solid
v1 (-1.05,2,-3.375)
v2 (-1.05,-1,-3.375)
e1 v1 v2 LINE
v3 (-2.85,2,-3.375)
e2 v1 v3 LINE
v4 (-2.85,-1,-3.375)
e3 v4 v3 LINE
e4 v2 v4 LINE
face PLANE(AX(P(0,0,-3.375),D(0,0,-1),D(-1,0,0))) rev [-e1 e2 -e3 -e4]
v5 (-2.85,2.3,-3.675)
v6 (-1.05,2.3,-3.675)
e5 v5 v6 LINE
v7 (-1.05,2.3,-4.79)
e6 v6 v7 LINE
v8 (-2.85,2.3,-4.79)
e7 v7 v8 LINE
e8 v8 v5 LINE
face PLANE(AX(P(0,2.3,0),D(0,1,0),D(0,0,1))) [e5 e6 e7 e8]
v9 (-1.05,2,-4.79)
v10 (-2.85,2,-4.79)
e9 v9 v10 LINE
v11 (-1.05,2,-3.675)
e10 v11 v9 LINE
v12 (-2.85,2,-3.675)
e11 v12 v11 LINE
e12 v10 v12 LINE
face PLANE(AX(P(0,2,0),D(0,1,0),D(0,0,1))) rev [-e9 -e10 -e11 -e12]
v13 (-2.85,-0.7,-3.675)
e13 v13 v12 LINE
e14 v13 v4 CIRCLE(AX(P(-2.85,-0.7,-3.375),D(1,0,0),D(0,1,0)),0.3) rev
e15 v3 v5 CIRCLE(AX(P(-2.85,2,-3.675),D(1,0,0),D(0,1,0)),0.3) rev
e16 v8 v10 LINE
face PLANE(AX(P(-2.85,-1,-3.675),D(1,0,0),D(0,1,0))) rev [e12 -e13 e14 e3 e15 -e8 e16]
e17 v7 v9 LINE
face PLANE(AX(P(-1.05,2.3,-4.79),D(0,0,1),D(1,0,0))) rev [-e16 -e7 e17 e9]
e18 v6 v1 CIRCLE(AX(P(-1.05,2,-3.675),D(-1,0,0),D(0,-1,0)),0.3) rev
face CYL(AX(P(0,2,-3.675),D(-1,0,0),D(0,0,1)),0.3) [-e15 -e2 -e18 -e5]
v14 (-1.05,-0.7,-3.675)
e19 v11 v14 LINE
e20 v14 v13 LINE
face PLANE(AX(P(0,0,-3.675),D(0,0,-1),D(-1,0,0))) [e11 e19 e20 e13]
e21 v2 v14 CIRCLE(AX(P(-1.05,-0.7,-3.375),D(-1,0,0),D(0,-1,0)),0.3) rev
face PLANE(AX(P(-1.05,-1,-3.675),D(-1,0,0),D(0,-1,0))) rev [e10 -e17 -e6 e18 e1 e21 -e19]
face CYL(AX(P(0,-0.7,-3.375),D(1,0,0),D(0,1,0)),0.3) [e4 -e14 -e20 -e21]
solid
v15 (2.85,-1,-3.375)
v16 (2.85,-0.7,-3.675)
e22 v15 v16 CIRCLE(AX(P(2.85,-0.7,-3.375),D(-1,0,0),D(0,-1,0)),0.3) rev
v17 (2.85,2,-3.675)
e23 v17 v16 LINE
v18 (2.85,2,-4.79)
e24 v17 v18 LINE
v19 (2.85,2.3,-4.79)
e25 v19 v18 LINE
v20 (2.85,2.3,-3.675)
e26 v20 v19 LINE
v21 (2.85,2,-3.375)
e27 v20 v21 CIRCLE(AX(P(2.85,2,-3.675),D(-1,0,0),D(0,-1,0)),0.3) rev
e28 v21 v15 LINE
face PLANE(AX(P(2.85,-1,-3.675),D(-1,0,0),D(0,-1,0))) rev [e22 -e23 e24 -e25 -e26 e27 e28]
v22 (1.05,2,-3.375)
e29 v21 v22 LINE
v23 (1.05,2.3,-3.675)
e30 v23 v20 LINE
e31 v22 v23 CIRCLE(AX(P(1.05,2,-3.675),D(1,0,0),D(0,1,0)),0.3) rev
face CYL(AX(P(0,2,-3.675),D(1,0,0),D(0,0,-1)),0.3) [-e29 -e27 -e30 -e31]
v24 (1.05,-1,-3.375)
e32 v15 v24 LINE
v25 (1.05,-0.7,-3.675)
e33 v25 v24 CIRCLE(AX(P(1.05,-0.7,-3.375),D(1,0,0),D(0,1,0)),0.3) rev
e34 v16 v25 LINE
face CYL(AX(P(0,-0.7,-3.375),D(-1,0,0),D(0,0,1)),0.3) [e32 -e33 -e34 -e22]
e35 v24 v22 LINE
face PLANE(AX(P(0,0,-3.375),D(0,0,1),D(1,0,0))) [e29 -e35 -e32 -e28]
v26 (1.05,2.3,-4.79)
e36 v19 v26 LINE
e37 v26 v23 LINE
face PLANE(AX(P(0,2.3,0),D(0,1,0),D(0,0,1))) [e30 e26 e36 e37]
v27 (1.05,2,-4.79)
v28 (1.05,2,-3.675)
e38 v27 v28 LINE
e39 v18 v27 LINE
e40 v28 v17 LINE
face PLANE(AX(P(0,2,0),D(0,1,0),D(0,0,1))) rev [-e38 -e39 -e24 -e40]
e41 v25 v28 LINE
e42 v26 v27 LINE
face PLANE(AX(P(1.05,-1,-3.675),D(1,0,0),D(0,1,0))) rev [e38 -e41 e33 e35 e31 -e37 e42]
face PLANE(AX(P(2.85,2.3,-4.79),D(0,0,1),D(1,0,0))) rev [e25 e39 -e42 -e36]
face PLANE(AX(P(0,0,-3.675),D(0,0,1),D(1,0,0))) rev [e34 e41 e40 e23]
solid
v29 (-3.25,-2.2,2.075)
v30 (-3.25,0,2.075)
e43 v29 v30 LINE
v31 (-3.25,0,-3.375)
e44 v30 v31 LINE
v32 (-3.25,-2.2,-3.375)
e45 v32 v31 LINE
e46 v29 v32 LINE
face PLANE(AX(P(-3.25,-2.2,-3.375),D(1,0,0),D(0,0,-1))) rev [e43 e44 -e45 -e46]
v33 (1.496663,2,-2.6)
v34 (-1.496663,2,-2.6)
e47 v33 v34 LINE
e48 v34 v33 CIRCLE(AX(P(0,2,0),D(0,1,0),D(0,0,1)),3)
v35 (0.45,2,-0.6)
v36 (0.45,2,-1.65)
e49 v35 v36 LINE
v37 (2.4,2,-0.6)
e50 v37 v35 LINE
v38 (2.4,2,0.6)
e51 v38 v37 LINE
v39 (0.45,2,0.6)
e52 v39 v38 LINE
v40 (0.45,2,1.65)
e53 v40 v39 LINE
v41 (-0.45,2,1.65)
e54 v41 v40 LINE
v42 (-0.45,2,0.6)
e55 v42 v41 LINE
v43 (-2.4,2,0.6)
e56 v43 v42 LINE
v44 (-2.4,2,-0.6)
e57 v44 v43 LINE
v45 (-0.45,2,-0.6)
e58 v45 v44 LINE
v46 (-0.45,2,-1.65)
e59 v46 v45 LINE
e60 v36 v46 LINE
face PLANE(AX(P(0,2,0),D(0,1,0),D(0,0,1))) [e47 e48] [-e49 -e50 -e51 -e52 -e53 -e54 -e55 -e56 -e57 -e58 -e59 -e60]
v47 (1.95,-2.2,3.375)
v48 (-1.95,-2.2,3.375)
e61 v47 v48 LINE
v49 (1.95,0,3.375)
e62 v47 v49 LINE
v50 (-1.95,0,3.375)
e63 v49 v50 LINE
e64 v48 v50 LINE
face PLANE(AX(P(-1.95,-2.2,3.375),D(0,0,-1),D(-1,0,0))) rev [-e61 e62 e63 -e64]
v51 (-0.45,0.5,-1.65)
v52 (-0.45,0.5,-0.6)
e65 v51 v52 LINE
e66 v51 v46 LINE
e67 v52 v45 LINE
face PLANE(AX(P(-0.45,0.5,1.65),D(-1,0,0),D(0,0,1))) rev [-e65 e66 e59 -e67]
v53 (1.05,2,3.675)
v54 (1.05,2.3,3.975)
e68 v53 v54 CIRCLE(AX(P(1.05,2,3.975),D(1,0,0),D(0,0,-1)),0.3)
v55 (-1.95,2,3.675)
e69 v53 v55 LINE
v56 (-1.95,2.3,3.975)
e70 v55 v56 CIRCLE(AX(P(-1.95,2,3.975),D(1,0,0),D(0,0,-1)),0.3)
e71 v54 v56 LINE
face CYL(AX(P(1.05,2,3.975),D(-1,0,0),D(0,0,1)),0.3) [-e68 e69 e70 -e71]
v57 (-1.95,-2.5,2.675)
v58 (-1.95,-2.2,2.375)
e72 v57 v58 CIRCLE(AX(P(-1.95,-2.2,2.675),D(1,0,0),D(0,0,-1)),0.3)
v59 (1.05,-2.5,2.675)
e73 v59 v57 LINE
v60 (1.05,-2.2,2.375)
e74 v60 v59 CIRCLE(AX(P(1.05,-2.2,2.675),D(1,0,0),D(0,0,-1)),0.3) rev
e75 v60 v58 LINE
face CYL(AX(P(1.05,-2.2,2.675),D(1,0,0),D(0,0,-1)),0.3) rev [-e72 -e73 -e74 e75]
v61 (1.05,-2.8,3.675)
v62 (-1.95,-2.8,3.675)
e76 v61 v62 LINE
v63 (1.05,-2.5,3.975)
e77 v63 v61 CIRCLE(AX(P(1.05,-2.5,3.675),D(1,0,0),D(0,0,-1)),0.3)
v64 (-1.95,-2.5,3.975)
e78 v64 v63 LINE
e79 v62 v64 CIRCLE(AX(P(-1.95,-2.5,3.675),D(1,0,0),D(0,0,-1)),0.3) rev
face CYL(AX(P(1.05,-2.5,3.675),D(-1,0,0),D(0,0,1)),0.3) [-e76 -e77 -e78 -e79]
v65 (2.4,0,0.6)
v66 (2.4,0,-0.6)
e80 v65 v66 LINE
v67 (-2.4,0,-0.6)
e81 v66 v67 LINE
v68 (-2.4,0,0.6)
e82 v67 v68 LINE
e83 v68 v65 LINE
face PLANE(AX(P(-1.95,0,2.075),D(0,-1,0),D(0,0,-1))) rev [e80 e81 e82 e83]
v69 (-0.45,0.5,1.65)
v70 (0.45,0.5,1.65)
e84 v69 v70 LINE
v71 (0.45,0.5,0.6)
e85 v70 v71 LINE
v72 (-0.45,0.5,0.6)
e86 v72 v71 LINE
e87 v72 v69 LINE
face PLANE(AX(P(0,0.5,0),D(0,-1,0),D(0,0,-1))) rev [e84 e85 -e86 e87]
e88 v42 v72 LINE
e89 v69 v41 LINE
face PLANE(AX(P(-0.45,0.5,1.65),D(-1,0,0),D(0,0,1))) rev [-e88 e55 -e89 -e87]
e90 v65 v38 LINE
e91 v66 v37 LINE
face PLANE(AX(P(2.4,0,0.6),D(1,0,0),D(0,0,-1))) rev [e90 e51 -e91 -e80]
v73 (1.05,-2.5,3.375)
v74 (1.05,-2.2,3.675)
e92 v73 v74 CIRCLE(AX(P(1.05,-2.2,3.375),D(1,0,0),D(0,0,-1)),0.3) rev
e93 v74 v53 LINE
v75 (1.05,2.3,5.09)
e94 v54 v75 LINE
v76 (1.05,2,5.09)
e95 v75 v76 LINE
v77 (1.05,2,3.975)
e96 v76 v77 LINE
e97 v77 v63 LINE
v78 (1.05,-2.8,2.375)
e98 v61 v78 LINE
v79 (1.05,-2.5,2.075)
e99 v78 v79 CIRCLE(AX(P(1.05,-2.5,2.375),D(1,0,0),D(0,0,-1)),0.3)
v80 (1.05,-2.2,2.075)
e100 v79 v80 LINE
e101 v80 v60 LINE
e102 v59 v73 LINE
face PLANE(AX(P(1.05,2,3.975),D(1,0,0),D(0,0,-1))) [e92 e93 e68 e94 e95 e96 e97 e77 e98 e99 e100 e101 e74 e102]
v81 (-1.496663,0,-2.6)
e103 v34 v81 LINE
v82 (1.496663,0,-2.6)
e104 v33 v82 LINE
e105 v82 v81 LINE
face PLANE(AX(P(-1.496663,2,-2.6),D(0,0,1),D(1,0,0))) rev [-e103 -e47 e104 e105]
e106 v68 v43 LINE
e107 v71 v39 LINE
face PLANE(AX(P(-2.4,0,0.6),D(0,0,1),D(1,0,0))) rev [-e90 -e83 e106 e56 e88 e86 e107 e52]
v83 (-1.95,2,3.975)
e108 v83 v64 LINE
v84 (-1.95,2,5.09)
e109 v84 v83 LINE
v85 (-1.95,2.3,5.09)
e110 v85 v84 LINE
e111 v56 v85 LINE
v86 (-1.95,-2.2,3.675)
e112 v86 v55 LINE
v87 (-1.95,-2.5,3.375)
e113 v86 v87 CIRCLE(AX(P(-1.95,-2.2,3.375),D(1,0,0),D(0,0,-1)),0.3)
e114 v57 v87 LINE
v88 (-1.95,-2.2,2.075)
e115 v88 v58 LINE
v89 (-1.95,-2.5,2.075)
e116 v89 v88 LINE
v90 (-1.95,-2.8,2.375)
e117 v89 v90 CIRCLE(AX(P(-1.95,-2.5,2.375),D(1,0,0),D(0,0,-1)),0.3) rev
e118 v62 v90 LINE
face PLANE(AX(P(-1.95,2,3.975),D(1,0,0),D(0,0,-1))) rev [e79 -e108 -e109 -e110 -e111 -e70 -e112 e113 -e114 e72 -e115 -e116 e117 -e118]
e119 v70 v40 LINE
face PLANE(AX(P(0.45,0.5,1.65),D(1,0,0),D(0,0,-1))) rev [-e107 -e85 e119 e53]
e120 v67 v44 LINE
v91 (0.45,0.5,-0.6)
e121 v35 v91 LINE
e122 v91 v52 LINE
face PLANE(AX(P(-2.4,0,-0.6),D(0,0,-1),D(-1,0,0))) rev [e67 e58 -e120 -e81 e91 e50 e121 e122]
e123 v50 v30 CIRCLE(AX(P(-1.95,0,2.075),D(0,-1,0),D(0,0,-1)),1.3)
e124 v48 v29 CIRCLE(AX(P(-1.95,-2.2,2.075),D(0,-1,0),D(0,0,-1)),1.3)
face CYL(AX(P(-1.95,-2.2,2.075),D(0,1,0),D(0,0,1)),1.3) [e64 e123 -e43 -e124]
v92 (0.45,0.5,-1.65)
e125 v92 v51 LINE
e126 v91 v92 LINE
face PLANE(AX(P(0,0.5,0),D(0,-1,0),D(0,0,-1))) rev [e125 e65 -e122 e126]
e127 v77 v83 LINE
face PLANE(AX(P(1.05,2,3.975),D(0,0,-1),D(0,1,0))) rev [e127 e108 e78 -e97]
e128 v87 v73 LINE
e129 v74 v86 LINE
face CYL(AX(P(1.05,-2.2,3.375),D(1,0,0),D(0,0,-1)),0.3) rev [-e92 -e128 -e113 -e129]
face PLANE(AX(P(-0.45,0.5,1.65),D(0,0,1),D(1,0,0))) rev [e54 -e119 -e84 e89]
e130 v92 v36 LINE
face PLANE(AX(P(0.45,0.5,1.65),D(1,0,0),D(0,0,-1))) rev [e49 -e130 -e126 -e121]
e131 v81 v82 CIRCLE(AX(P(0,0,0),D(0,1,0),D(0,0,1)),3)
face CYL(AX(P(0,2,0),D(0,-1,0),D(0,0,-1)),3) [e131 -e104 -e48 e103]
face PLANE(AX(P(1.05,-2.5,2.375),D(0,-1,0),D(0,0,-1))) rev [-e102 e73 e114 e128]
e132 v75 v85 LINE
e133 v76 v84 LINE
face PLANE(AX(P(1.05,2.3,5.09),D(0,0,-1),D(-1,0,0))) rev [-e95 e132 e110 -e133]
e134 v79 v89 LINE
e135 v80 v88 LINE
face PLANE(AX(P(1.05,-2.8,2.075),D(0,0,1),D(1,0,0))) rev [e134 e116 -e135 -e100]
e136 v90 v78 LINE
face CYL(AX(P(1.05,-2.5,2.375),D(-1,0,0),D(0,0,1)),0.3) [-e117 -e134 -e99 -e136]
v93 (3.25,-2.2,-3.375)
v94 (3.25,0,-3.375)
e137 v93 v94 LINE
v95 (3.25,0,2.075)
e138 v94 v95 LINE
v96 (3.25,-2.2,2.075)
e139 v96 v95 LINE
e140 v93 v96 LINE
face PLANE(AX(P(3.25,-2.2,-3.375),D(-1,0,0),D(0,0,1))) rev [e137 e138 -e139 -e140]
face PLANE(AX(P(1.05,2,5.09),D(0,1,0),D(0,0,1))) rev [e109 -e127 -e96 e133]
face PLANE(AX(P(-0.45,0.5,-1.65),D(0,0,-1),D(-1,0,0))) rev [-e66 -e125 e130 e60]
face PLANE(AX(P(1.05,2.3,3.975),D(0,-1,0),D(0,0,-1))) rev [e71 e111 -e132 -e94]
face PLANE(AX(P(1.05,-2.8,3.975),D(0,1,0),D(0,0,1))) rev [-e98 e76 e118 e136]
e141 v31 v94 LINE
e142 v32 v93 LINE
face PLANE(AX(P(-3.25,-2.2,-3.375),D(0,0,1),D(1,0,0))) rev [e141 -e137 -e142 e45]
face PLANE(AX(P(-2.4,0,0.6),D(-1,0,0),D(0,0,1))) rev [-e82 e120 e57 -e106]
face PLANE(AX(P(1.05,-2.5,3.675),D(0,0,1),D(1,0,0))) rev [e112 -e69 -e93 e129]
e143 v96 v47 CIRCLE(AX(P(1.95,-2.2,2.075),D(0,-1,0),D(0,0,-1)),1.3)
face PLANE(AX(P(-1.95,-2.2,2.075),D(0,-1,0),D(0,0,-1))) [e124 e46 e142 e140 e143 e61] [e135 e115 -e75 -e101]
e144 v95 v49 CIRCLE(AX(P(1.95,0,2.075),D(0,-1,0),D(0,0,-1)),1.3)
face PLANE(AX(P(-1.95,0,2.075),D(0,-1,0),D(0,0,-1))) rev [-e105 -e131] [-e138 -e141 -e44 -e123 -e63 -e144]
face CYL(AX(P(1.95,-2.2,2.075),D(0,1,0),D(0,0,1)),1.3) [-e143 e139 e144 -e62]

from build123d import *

# Parameters (mm, degrees)
BOSS_EXTRUDE1_DEPTH   = 2
SKETCH2_W             = 4.8
SKETCH2_H             = 1.2
CUT_EXTRUDE1_DEPTH    = 5.69041576
SKETCH3_W             = 0.9
SKETCH3_H             = 3.3
CUT_EXTRUDE2_DEPTH    = 1.5
BOSS_EXTRUDE2_DEPTH   = 2.2
SKETCH9_W             = 1.8
SKETCH9_H             = 3
BOSS_EXTRUDE6_DEPTH   = 0.3
BOSS_EXTRUDE6_2_DEPTH = 0.3
FILLET4_R             = 0.3
FILLET5_R             = 0.3
SKETCH10_W            = 1.8
SKETCH10_H            = 1.415
BOSS_EXTRUDE7_DEPTH   = 0.3
FILLET6_R             = 0.3
FILLET7_R             = 0.3
BOSS_EXTRUDE8_START   = -1.95
BOSS_EXTRUDE8_DEPTH   = 3
FILLET8_START         = -3
FILLET8_DEPTH         = 5
FILLET8_START_2       = -1.95
FILLET8_2_DEPTH       = 3


with BuildPart() as part:
    # Sketch1 → Boss-Extrude1 (new body)
    with BuildSketch(Plane(origin=(0, 0, 0), x_dir=(1, 0, 0), z_dir=(0, 1, 0))):
        with BuildLine():
            Line((-1.496662955, 2.6), (1.496662955, 2.6))
            ThreePointArc((1.496662955, 2.6), (0, -3), (-1.496662955, 2.6))
        make_face()
    extrude(amount=BOSS_EXTRUDE1_DEPTH)

    # Sketch2 → Cut-Extrude1 (cut, through all)
    with BuildSketch(Plane(origin=(0, 2, 0), x_dir=(1, 0, 0), z_dir=(0, 1, 0))):
        Rectangle(SKETCH2_W, SKETCH2_H)
    extrude(amount=-CUT_EXTRUDE1_DEPTH, mode=Mode.SUBTRACT)

    # Sketch3 → Cut-Extrude2 (cut)
    with BuildSketch(Plane(origin=(0, 2, 0), x_dir=(1, 0, 0), z_dir=(0, 1, 0))):
        Rectangle(SKETCH3_W, SKETCH3_H)
    extrude(amount=-CUT_EXTRUDE2_DEPTH, mode=Mode.SUBTRACT)



with BuildPart() as body_2:
    # Sketch4 → Boss-Extrude2 (new body)
    with BuildSketch(Plane.XZ):
        with BuildLine():
            Line((-3.25, -3.375), (3.25, -3.375))
            Line((3.25, -3.375), (3.25, 2.075))
            ThreePointArc((3.25, 2.075), (2.869238816, 2.994238816), (1.95, 3.375))
            Line((1.95, 3.375), (-1.95, 3.375))
            ThreePointArc((-1.95, 3.375), (-2.869238816, 2.994238816), (-3.25, 2.075))
            Line((-3.25, 2.075), (-3.25, -3.375))
        make_face()
    extrude(amount=BOSS_EXTRUDE2_DEPTH)


with BuildPart() as body_3:
    # Sketch9 → Boss-Extrude6 (new body)
    with BuildSketch(Plane(origin=(0, 0, -3.375), x_dir=(-1, 0, 0), z_dir=(0, 0, -1))):
        with Locations((-1.95, 0.5)):
            Rectangle(SKETCH9_W, SKETCH9_H)
    extrude(amount=BOSS_EXTRUDE6_DEPTH)

    # Fillet4
    fillet4_edges = [body_3.edges().sort_by_distance(p)[0] for p in [
        (1.95, -1, -3.675),
    ]]
    fillet(fillet4_edges, radius=FILLET4_R - 0.0001)  # a hair under: the kernel refuses the full size



with BuildPart() as body_4:
    # Sketch9 → Boss-Extrude6 2 (new body)
    with BuildSketch(Plane(origin=(0, 0, -3.375), x_dir=(-1, 0, 0), z_dir=(0, 0, -1))):
        with Locations((1.95, 0.5)):
            Rectangle(SKETCH9_W, SKETCH9_H)
    extrude(amount=BOSS_EXTRUDE6_2_DEPTH)

    # Fillet5
    fillet5_edges = [body_4.edges().sort_by_distance(p)[0] for p in [
        (-1.95, -1, -3.675),
    ]]
    fillet(fillet5_edges, radius=FILLET5_R - 0.0001)  # a hair under: the kernel refuses the full size


with BuildPart() as body_3_1:
    add(body_3.part)

    add(body_4.part)  # Boss-Extrude7 merges body 4
    # Sketch10 → Boss-Extrude7 (add)
    with BuildSketch(Plane(origin=(0, 2, 0), x_dir=(-1, 0, 0), z_dir=(0, 1, 0))):
        with Locations((1.95, -4.0825)):
            Rectangle(SKETCH10_W, SKETCH10_H)
        with Locations((-1.95, -4.0825)):
            Rectangle(SKETCH10_W, SKETCH10_H)
    extrude(amount=BOSS_EXTRUDE7_DEPTH)

    # Fillet6
    fillet6_edges = [body_3_1.edges().sort_by_distance(p)[0] for p in [
        (-1.95, 2.3, -3.375),
    ]]
    fillet(fillet6_edges, radius=FILLET6_R)

    # Fillet7
    fillet7_edges = [body_3_1.edges().sort_by_distance(p)[0] for p in [
        (1.95, 2.3, -3.375),
    ]]
    fillet(fillet7_edges, radius=FILLET7_R)


with BuildPart() as part_1:
    add(part.part)

    add(body_2.part)  # Boss-Extrude8 merges body 2
    # Sketch11 → Boss-Extrude8 (add)
    with BuildSketch(Plane(origin=(0, 0, 0), x_dir=(0, 0, -1), z_dir=(1, 0, 0)).offset(BOSS_EXTRUDE8_START)):
        with BuildLine():
            Line((-2.375, -2.2), (-2.375, -2.5))
            Line((-2.375, -2.5), (-3.675, -2.5))
            Line((-3.675, -2.5), (-3.675, 2))
            ThreePointArc((-3.675, 2), (-3.762867966, 2.212132034), (-3.975, 2.3))
            Line((-3.975, 2.3), (-5.09, 2.3))
            Line((-5.09, 2.3), (-5.09, 2))
            Line((-5.09, 2), (-3.975, 2))
            Line((-3.975, 2), (-3.975, -2.8))
            Line((-3.975, -2.8), (-2.075, -2.8))
            Line((-2.075, -2.8), (-2.075, -2.2))
            Line((-2.075, -2.2), (-2.375, -2.2))
        make_face()
    extrude(amount=BOSS_EXTRUDE8_DEPTH)

    # Fillet8: read off the stored shape, not the designer's step
    # Fillet8 outline → Fillet8 (cut)
    with BuildSketch(Plane.YZ.offset(FILLET8_START)):
        with BuildLine():
            Line((-2.8, 2.075), (-2.5, 2.075))
            ThreePointArc((-2.5, 2.075), (-2.712132034, 2.162867966), (-2.8, 2.375))
            Line((-2.8, 2.375), (-2.8, 2.075))
        make_face()
        with BuildLine():
            Line((-2.8, 3.975), (-2.8, 3.675))
            ThreePointArc((-2.8, 3.675), (-2.712132034, 3.887132034), (-2.5, 3.975))
            Line((-2.5, 3.975), (-2.8, 3.975))
        make_face()
    extrude(amount=FILLET8_DEPTH, mode=Mode.SUBTRACT)

    # Fillet8 2 outline → Fillet8 2 (add)
    with BuildSketch(Plane.YZ.offset(FILLET8_START_2)):
        with BuildLine():
            ThreePointArc((-2.2, 2.375), (-2.412132034, 2.462867966), (-2.5, 2.675))
            Line((-2.5, 2.675), (-2.5, 2.375))
            Line((-2.5, 2.375), (-2.2, 2.375))
        make_face()
        with BuildLine():
            ThreePointArc((-2.5, 3.375), (-2.412132034, 3.587132034), (-2.2, 3.675))
            Line((-2.2, 3.675), (-2.5, 3.675))
            Line((-2.5, 3.675), (-2.5, 3.375))
        make_face()
    extrude(amount=FILLET8_2_DEPTH)


solid = Compound([body_3_1.part, part_1.part])
